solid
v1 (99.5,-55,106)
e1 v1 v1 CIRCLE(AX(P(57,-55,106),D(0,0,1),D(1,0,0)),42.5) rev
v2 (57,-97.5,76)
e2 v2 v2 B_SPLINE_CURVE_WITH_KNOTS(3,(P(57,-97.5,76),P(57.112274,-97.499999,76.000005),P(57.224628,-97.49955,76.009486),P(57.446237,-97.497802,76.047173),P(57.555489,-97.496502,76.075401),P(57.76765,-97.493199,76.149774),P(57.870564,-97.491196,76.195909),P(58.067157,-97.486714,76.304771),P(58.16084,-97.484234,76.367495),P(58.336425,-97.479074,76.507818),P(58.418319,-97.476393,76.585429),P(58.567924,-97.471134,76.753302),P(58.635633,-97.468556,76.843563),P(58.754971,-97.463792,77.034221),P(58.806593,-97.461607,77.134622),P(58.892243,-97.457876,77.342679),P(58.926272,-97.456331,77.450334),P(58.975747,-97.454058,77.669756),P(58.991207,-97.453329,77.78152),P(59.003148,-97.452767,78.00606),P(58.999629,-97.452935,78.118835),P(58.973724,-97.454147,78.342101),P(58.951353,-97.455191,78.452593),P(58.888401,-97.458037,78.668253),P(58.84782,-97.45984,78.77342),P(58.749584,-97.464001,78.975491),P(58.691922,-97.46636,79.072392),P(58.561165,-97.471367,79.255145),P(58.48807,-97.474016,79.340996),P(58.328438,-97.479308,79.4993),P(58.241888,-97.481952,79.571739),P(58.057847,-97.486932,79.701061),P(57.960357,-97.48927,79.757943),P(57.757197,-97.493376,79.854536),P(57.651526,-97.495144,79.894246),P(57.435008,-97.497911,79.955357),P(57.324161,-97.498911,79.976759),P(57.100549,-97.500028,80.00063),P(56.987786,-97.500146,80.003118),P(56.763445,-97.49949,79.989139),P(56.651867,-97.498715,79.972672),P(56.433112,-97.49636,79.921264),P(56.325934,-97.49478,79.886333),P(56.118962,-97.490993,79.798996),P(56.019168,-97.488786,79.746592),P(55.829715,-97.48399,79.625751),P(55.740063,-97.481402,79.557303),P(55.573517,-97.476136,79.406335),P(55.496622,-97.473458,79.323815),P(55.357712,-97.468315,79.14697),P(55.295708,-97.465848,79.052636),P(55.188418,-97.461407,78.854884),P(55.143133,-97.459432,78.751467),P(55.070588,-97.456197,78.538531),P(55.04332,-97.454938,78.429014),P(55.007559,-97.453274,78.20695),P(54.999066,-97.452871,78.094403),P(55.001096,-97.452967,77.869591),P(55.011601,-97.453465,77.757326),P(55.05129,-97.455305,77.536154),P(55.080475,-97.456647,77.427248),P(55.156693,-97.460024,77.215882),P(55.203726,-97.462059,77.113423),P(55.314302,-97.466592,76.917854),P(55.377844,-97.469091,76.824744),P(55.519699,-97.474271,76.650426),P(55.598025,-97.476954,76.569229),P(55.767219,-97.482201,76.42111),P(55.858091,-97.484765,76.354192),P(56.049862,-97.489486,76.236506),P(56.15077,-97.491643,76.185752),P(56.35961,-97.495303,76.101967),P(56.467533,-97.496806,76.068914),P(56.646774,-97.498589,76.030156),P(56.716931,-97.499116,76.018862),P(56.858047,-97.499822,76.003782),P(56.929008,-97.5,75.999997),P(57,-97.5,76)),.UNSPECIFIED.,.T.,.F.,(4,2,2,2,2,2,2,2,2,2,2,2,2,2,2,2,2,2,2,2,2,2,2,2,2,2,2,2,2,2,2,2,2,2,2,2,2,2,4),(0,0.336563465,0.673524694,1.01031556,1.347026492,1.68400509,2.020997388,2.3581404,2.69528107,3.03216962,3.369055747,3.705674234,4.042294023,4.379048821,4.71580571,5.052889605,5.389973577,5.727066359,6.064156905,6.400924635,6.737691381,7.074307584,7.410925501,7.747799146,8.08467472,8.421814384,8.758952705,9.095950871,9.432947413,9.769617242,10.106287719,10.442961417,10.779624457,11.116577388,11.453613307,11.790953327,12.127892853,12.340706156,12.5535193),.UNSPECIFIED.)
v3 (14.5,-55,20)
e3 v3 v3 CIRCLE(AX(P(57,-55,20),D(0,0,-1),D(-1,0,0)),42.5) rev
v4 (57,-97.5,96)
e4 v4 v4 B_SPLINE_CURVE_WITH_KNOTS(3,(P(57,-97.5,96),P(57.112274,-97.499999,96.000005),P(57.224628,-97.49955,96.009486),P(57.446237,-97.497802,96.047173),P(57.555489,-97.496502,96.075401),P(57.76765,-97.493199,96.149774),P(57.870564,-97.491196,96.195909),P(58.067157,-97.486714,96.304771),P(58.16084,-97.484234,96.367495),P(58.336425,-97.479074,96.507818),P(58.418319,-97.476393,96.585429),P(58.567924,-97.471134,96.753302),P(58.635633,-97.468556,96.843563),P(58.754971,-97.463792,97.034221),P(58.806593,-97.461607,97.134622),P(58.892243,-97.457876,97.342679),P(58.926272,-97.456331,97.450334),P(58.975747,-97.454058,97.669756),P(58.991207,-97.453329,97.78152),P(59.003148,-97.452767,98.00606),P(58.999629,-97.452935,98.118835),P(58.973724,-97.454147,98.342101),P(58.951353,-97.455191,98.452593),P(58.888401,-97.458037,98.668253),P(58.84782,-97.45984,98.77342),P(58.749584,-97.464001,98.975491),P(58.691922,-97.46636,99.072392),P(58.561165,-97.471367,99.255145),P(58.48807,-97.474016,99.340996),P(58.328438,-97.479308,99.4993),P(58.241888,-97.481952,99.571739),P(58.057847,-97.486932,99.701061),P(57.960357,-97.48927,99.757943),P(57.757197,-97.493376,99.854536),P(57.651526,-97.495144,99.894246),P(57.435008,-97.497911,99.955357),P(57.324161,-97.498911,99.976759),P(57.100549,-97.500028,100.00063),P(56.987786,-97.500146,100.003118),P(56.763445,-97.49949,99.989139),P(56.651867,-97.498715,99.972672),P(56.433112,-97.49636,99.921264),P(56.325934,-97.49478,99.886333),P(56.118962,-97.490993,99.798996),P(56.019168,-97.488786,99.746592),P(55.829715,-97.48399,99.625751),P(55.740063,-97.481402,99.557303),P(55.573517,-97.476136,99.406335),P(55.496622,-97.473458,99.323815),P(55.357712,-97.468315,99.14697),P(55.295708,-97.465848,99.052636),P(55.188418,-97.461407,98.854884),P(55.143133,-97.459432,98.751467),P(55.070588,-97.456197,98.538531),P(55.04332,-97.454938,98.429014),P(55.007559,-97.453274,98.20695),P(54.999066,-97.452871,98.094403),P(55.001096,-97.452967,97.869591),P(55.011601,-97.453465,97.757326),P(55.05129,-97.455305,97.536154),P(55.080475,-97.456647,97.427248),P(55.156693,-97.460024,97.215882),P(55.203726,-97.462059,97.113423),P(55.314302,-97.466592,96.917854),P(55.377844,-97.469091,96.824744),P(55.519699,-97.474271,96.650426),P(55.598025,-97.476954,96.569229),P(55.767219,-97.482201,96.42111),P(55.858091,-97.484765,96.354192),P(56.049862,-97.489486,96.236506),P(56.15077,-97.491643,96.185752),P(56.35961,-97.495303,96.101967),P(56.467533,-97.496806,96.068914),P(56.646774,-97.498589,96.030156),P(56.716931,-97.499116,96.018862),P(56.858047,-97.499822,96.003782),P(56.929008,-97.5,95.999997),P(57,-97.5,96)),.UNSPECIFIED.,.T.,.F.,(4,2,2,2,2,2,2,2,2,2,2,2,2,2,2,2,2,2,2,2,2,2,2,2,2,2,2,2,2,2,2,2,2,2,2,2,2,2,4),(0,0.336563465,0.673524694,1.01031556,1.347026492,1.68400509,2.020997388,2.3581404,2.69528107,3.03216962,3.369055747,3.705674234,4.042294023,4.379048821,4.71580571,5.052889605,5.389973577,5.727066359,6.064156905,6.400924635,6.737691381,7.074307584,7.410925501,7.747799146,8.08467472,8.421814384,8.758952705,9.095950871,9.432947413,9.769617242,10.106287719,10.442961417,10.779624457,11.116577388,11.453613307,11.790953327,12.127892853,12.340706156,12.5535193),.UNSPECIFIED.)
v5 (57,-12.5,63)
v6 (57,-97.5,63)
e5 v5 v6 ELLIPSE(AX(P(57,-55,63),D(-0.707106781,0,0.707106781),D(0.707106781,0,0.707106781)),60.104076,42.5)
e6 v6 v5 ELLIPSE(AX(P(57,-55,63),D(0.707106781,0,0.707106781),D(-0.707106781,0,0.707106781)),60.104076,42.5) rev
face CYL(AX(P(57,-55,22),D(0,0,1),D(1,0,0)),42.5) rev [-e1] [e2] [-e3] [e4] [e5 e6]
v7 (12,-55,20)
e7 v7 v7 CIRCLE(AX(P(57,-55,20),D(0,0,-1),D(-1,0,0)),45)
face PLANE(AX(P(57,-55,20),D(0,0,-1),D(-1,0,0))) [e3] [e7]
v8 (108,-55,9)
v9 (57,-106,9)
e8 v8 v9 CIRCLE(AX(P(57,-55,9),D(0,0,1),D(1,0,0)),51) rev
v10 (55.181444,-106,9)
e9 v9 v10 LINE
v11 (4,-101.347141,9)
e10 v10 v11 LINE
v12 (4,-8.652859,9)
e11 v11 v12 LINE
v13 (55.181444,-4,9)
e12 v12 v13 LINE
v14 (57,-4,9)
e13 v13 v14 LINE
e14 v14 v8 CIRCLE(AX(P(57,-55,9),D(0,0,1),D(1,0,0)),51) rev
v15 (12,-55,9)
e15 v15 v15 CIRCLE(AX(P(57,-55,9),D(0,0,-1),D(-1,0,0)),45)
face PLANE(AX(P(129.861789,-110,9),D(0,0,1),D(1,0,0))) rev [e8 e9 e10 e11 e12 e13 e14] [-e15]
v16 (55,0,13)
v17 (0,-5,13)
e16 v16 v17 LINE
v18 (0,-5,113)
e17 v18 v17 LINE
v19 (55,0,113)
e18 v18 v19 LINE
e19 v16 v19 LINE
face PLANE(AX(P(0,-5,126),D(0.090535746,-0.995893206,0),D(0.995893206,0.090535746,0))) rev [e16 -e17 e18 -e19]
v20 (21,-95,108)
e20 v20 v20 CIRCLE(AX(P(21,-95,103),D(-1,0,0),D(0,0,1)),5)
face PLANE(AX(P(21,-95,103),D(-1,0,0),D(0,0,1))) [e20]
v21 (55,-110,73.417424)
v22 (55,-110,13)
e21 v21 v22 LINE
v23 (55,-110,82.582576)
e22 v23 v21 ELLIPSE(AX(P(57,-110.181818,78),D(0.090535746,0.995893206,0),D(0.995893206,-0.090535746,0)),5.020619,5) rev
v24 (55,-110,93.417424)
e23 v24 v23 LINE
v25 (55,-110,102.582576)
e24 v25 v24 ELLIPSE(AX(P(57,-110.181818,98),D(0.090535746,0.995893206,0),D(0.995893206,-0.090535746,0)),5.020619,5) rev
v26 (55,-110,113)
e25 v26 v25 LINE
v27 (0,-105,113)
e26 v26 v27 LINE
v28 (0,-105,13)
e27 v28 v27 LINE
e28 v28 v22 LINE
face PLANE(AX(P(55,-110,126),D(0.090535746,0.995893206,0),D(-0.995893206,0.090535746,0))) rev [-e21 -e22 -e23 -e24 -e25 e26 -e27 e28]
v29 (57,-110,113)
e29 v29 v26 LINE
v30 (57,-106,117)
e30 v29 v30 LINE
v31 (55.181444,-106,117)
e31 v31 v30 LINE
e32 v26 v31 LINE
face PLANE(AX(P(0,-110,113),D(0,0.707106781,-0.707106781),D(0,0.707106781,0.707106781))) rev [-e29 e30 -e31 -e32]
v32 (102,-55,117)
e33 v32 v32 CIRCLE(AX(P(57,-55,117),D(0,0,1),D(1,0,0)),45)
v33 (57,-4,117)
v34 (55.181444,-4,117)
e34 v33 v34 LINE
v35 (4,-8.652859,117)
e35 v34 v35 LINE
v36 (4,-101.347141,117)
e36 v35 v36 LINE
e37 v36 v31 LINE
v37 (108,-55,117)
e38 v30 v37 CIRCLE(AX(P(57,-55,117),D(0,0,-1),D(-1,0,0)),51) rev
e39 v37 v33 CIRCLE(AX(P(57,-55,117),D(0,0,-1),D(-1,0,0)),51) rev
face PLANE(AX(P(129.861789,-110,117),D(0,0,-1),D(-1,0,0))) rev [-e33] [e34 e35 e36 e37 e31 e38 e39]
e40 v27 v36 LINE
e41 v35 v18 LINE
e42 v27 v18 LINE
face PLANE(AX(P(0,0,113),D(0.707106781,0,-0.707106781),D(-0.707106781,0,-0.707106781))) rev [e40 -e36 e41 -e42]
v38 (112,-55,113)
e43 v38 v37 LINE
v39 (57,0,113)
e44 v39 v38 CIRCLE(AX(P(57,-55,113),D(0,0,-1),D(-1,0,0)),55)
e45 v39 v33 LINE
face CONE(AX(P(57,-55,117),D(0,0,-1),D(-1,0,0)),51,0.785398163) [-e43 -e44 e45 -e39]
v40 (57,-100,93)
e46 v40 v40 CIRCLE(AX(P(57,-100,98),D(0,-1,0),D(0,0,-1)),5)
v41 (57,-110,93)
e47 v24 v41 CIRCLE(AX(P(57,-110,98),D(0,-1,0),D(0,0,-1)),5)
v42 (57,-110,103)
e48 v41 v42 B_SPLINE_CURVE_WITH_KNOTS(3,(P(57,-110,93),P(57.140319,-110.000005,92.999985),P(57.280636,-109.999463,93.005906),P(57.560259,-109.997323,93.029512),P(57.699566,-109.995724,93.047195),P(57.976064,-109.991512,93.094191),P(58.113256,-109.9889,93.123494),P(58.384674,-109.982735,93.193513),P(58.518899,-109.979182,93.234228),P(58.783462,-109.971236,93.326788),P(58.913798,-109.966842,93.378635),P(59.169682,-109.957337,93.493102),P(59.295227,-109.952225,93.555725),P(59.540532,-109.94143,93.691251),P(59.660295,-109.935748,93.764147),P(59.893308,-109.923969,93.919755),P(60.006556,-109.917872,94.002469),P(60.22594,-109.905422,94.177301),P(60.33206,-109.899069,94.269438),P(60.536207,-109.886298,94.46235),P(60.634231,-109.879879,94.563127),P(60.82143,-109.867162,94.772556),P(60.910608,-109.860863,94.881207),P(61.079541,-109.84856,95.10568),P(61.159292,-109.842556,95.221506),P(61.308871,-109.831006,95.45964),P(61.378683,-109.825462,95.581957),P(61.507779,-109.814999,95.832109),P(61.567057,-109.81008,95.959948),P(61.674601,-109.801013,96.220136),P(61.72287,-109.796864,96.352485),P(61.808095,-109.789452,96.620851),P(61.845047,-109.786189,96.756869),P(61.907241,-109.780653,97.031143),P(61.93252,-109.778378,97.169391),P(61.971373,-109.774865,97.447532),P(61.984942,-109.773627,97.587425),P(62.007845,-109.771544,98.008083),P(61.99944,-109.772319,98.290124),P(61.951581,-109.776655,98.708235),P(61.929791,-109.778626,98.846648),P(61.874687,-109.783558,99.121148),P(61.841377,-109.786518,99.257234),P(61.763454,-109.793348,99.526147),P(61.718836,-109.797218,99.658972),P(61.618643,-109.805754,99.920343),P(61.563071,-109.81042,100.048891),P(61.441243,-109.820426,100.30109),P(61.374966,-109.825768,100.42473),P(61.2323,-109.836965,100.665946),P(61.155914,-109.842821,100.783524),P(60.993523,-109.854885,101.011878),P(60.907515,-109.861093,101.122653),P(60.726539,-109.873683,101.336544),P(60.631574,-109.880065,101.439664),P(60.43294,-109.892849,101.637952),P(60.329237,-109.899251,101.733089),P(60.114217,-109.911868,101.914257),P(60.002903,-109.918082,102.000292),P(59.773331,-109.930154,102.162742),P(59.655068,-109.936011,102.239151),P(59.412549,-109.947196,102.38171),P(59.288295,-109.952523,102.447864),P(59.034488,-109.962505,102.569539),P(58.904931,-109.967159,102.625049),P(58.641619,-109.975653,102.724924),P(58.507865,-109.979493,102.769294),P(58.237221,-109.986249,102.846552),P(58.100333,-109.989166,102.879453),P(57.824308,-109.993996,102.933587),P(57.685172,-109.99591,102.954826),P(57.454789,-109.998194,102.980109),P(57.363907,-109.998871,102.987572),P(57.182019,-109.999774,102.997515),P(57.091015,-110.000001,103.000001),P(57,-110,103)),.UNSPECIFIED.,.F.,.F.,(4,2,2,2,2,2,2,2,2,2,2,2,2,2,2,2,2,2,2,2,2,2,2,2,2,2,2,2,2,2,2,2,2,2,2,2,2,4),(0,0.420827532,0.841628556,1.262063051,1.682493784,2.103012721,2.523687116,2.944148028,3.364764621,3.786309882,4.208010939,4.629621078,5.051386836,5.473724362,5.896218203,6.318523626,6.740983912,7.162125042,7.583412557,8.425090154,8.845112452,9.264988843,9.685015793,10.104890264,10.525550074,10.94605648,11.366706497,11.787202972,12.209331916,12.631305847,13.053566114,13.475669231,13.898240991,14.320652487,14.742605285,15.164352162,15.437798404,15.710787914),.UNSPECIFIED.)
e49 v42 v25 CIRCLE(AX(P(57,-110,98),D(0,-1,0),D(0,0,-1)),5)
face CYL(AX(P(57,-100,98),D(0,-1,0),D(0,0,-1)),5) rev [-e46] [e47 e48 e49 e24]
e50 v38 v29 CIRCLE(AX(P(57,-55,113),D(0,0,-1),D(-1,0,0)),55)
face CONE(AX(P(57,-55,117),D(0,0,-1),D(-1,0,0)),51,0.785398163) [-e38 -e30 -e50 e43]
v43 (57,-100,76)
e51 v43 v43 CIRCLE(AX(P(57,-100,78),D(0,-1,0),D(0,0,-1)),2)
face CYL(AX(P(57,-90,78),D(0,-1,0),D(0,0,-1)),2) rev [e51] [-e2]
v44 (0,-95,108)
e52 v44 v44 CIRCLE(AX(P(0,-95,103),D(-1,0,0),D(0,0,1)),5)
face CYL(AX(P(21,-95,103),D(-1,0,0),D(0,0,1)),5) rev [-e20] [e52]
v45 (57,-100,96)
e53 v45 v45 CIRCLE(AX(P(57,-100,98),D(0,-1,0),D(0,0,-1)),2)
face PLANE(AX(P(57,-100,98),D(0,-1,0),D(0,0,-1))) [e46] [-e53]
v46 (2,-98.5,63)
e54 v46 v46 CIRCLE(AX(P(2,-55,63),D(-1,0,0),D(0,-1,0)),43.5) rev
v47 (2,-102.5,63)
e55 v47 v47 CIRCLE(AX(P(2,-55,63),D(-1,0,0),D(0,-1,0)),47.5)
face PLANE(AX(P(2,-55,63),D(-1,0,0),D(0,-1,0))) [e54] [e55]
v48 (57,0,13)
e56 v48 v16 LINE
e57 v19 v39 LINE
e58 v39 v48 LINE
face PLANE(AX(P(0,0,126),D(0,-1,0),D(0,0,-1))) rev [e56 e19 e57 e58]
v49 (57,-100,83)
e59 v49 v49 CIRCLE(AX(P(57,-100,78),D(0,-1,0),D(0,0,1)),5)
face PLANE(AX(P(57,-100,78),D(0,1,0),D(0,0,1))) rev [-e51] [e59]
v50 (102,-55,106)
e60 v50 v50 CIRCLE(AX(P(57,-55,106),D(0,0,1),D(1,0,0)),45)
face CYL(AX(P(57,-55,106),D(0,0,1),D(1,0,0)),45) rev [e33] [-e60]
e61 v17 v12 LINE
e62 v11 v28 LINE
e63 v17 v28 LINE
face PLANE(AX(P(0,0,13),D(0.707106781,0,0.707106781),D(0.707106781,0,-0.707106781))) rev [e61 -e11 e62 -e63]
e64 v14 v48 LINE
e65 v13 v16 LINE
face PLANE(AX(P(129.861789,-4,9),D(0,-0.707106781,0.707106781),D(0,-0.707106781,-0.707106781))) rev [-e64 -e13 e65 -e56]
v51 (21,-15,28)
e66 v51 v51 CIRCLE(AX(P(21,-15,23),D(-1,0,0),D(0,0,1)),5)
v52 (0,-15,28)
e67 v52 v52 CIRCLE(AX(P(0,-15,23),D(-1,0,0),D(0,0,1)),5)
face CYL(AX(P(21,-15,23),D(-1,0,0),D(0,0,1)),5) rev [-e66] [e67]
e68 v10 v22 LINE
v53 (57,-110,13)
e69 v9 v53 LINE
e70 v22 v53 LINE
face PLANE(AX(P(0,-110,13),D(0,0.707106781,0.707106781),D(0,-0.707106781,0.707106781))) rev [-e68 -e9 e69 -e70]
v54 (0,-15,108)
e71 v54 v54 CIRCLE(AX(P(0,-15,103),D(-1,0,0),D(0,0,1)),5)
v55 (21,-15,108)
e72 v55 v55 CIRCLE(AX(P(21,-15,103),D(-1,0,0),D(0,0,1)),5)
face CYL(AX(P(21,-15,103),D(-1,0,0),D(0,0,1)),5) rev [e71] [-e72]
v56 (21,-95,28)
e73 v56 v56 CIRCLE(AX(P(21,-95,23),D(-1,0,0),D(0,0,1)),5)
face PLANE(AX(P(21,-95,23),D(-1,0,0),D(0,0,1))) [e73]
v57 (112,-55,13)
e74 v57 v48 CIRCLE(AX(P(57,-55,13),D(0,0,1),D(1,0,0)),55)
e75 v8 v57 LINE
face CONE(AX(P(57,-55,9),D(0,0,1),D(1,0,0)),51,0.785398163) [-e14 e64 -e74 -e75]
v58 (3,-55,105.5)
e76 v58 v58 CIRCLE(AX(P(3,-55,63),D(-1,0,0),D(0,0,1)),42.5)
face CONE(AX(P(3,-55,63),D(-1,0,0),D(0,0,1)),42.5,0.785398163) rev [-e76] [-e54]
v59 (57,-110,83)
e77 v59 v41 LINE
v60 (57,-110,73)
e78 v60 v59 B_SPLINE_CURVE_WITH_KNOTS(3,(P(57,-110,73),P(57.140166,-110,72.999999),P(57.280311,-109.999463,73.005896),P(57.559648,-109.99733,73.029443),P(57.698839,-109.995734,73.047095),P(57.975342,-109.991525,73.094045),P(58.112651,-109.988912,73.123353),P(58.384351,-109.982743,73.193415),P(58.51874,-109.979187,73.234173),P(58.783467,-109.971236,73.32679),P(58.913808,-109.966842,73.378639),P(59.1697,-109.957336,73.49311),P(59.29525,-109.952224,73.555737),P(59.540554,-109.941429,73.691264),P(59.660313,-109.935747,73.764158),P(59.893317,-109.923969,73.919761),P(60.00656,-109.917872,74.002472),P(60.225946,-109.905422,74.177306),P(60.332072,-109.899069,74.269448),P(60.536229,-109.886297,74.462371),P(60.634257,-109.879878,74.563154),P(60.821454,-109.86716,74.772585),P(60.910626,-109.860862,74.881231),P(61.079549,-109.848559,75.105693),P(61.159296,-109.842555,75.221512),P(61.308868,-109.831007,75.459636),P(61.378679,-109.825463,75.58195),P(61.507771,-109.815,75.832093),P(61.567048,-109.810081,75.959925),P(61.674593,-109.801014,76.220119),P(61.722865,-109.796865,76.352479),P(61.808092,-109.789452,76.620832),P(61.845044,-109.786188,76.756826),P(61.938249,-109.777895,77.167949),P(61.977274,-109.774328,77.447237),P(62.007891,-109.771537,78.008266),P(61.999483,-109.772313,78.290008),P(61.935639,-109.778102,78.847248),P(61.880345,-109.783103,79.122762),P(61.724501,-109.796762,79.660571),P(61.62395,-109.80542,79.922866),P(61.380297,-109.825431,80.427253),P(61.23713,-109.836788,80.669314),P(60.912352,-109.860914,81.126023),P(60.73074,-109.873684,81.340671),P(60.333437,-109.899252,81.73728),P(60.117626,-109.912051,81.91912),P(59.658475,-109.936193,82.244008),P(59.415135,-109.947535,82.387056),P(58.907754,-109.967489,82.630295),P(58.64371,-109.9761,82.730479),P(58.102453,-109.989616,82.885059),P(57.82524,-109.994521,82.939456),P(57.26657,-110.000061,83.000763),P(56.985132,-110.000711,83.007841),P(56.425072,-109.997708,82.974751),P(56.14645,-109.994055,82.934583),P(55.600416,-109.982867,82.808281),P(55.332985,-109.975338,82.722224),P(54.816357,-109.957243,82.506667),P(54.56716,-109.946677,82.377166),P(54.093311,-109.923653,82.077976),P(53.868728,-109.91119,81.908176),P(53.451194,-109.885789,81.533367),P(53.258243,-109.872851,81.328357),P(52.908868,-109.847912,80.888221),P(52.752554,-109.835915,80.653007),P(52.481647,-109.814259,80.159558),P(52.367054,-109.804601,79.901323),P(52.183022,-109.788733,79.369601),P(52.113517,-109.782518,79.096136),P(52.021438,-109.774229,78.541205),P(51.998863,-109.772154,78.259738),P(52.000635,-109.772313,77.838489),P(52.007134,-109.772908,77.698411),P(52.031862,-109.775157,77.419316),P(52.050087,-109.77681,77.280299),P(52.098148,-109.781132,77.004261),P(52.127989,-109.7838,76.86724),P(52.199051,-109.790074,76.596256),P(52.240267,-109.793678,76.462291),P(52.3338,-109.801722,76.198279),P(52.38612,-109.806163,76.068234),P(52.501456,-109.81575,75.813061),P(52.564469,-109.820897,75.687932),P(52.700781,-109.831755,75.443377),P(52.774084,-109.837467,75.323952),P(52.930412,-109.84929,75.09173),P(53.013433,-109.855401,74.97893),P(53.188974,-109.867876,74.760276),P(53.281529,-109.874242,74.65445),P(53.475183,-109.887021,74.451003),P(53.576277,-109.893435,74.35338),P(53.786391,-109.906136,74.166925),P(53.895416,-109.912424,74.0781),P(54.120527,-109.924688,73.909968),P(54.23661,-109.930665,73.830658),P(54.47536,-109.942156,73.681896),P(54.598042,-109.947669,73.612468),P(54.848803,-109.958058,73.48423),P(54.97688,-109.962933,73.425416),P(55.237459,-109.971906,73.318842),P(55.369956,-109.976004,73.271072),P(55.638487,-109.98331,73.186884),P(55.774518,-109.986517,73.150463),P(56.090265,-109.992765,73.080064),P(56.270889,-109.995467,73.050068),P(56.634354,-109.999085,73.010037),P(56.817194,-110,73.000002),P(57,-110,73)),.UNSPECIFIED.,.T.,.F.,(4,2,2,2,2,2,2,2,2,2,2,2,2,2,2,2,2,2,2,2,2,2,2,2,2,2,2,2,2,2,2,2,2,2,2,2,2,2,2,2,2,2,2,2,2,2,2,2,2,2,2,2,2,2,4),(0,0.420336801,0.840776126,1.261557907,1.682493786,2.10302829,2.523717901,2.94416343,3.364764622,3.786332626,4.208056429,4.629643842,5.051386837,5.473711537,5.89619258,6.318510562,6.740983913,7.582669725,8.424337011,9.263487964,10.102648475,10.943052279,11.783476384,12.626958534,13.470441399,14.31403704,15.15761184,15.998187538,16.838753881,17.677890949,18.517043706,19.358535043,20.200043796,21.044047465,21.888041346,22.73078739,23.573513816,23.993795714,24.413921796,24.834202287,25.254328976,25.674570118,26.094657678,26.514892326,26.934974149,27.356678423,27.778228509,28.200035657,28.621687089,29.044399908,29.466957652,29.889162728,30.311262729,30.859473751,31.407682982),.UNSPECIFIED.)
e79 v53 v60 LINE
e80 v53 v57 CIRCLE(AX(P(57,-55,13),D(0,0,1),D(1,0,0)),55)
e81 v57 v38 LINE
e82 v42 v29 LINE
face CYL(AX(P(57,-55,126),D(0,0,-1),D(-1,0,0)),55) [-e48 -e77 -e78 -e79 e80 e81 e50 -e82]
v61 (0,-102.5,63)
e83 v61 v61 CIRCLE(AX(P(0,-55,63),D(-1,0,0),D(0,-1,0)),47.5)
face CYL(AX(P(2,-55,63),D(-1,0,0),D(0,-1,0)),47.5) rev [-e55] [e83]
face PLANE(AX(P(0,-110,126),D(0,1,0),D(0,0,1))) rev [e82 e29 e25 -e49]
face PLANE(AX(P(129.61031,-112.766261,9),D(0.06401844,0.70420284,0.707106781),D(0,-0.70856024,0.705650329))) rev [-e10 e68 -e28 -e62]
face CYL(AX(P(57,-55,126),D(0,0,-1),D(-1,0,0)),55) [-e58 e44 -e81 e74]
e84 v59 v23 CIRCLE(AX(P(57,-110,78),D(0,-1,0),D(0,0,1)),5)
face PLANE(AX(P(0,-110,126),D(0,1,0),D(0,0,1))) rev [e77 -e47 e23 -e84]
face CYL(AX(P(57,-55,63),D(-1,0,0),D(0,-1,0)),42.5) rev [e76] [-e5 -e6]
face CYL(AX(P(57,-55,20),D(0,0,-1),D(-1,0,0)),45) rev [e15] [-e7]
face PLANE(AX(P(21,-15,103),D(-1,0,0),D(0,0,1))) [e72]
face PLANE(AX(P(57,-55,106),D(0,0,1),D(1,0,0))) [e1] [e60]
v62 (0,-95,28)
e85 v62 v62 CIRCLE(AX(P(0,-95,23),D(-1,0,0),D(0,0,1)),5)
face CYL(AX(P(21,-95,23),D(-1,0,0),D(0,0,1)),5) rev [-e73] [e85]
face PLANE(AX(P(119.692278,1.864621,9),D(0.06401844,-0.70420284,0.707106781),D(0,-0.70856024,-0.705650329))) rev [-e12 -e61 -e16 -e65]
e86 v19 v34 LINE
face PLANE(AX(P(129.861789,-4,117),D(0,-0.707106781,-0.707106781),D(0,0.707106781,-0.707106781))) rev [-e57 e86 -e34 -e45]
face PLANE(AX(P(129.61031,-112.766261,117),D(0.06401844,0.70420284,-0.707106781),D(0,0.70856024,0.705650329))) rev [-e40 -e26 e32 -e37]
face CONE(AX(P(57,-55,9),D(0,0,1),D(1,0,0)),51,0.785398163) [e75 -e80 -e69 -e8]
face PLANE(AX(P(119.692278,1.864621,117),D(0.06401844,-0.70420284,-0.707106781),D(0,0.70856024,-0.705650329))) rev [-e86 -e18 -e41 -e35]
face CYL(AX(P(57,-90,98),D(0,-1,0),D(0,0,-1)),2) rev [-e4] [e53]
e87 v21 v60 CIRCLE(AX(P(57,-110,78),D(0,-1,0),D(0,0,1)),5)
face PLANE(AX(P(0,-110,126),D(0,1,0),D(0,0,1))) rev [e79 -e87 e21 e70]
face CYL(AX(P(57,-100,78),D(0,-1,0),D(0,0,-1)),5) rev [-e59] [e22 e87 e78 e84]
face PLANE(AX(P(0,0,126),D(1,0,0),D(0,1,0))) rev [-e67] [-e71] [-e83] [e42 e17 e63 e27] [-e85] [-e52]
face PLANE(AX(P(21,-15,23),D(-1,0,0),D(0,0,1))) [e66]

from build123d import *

# Parameters (mm, degrees)
SKETCH_1_W           = 112
SKETCH_1_H           = 110
EXTRUDE_1_DEPTH      = 126
FILLET_1_R           = 55
SKETCH_9_R           = 42.5
CUT_EXTRUDE_5_DEPTH  = 104
SKETCH_10_R          = 42.5
CUT_EXTRUDE_6_DEPTH  = 57
CUT_EXTRUDE_START    = -50
SKETCH_11_R          = 42.5
CUT_EXTRUDE_7_DEPTH  = 50
CHAMFER_1_SIZE       = 55
CHAMFER_1_SIZE2      = 5
CHAMFER_2_SIZE       = 5
CHAMFER_2_SIZE2      = 55
SKETCH_14_W          = 143.089430894
SKETCH_14_H          = 9
CUT_EXTRUDE_8_DEPTH  = 202.295802241
CHAMFER_5_SIZE       = 4
CHAMFER_6_SIZE       = 4
SKETCH_18_R          = 5
CUT_EXTRUDE_9_DEPTH  = 21
SKETCH_19_R          = 45
CUT_EXTRUDE_10_DEPTH = 11
CUT_EXTRUDE_START_2  = -11
SKETCH_20_R          = 45
CUT_EXTRUDE_11_DEPTH = 11
CHAMFER_7_SIZE       = 4
SKETCH_17_R          = 47.5
SKETCH_17_R_2        = 42.5
CUT_EXTRUDE_12_DEPTH = 2
CHAMFER_8_SIZE       = 1
SKETCH_21_R          = 5
CUT_EXTRUDE_13_DEPTH = 10
SKETCH_22_R          = 2
CUT_EXTRUDE_14_DEPTH = 10


# Some blends are built 0.0001 mm under size
with BuildPart() as part:
    # 草图1 → 拉伸1 (new body)
    with BuildSketch(Plane.XY):
        with Locations((56, -55)):
            Rectangle(SKETCH_1_W, SKETCH_1_H)
    extrude(amount=EXTRUDE_1_DEPTH)

    # 圆角1
    fillet_1_edges = [part.edges().sort_by_distance(p)[0] for p in [
        (112, -110, 63),
        (112, 0, 63),
    ]]
    fillet(fillet_1_edges, radius=FILLET_1_R - 0.0001)  # a hair under: the kernel refuses the full size

    # 草图9 → 切除-拉伸5 (cut)
    with BuildSketch(Plane.XY.offset(126)):
        with Locations((57, -55)):
            Circle(SKETCH_9_R)
    extrude(amount=-CUT_EXTRUDE_5_DEPTH, mode=Mode.SUBTRACT)

    # 草图10 → 切除-拉伸6 (cut)
    with BuildSketch(Plane.ZY):
        with Locations(Location((63, -55, 0), (0, 0, 270))):
            Circle(SKETCH_10_R)
    extrude(amount=-CUT_EXTRUDE_6_DEPTH, mode=Mode.SUBTRACT)

    # 草图11 → 切除-拉伸7 (cut)
    with BuildSketch(Plane(origin=(0, 0, 0), x_dir=(-1, 0, 0), z_dir=(0, 0, -1)).offset(CUT_EXTRUDE_START)):
        with Locations(Location((-57, -55, 0), (0, 0, 180))):
            Circle(SKETCH_11_R)
    extrude(amount=CUT_EXTRUDE_7_DEPTH, mode=Mode.SUBTRACT)

    # 倒角1
    chamfer_1_edges = [part.edges().sort_by_distance(p)[0] for p in [
        (0, 0, 63),
    ]]
    chamfer_1_side = [part.faces().sort_by_distance(p)[0] for p in [
        (28.50005, 0, 63),
    ]]
    chamfer(chamfer_1_edges, length=CHAMFER_1_SIZE, length2=CHAMFER_1_SIZE2, reference=chamfer_1_side[0])

    # 倒角2
    chamfer_2_edges = [part.edges().sort_by_distance(p)[0] for p in [
        (0, -110, 63),
    ]]
    chamfer_2_side = [part.faces().sort_by_distance(p)[0] for p in [
        (0, -57.5, 1.640152432),
    ]]
    chamfer(chamfer_2_edges, length=CHAMFER_2_SIZE, length2=CHAMFER_2_SIZE2, reference=chamfer_2_side[0])

    # 草图14 → 切除-拉伸8 (cut, through all)
    with BuildSketch(Plane(origin=(0, 0, 0), x_dir=(1, 0, 0), z_dir=(0, 1, 0))):
        with Locations((58.317073171, -4.5)):
            Rectangle(SKETCH_14_W, SKETCH_14_H)
        with Locations((58.317073171, -121.5)):
            Rectangle(SKETCH_14_W, SKETCH_14_H)
    extrude(amount=-CUT_EXTRUDE_8_DEPTH, mode=Mode.SUBTRACT)

    # 倒角5
    chamfer_5_edges = [part.edges().sort_by_distance(p)[0] for p in [
        (0, -55, 117),
    ]]
    chamfer(chamfer_5_edges, length=CHAMFER_5_SIZE)

    # 倒角6
    chamfer_6_edges = [part.edges().sort_by_distance(p)[0] for p in [
        (0, -55, 9),
    ]]
    chamfer(chamfer_6_edges, length=CHAMFER_6_SIZE)

    # 草图18 → 切除-拉伸9 (cut)
    with BuildSketch(Plane.ZY):
        with Locations((23, -15)):
            Circle(SKETCH_18_R)
        with Locations((103, -15)):
            Circle(SKETCH_18_R)
        with Locations((23, -95)):
            Circle(SKETCH_18_R)
        with Locations((103, -95)):
            Circle(SKETCH_18_R)
    extrude(amount=-CUT_EXTRUDE_9_DEPTH, mode=Mode.SUBTRACT)

    # 草图19 → 切除-拉伸10 (cut)
    with BuildSketch(Plane.XY.offset(117)):
        with Locations((57, -55)):
            Circle(SKETCH_19_R)
    extrude(amount=-CUT_EXTRUDE_10_DEPTH, mode=Mode.SUBTRACT)

    # 草图20 → 切除-拉伸11 (cut)
    with BuildSketch(Plane(origin=(0, 0, 9), x_dir=(-1, 0, 0), z_dir=(0, 0, -1)).offset(CUT_EXTRUDE_START_2)):
        with Locations(Location((-57, -55, 0), (0, 0, 180))):
            Circle(SKETCH_20_R)
    extrude(amount=CUT_EXTRUDE_11_DEPTH, mode=Mode.SUBTRACT)

    # 倒角7
    # the kernel refuses this chamfer: 4 mm, written as the material it takes off along each edge
    with BuildSketch(Plane(origin=(-6.244486468, -104.432319412, 117), x_dir=(-0.002489359702032544, -0.027382956722357982, -0.9996219169112968), z_dir=(0.9958932064677039, -0.09053574604251853, 0)), Plane(origin=(65.244486468, 0.931316952, 117), x_dir=(-0.002489359702032457, 0.027382956722357025, -0.9996219169112968), z_dir=(-0.9958932064677039, -0.09053574604251853, 0))) as chamfer_7_piece_1:
        Polygon((CHAMFER_7_SIZE * 0.999621916911, CHAMFER_7_SIZE * 0.0274958766106), (-CHAMFER_7_SIZE * 0.0274958766106, CHAMFER_7_SIZE * 0.999621916911), (0, 0), align=None)
    extrude(amount=71.783774074, mode=Mode.SUBTRACT)
    with BuildSketch(Plane(origin=(57.0001, -110, 117), x_dir=(0, 0.9996219169112968, 0.027495876610585647), z_dir=(-1, 0, 0)), Plane(origin=(44.713268048, 0, 117), x_dir=(0, -0.9996219169112968, 0.02749587661058563), z_dir=(1, 0, 0))) as chamfer_7_piece_2:
        Polygon((CHAMFER_7_SIZE * 0.999621916911, CHAMFER_7_SIZE * 0.0274958766106), (-CHAMFER_7_SIZE * 0.0274958766106, CHAMFER_7_SIZE * 0.999621916911), (0, 0), align=None)
    extrude(amount=12.286831952, mode=Mode.SUBTRACT)
    with BuildSketch(Plane(origin=(57.0001, -55.0001, 117), x_dir=(0, -1, 0), z_dir=(-1, 0, 0))) as chamfer_7_piece_3:
        Polygon((54.9999 - CHAMFER_7_SIZE, 0), (54.9999, -CHAMFER_7_SIZE), (54.9999, 0), align=None)
    revolve(axis=Axis((57.0001, -55.0001, 117), (0, 0, 1)), revolution_arc=90, mode=Mode.SUBTRACT)
    with BuildSketch(Plane(origin=(57.0001, -54.9999, 117), x_dir=(1, 0, 0), z_dir=(0, -1, 0))) as chamfer_7_piece_4:
        Polygon((54.9999 - CHAMFER_7_SIZE, 0), (54.9999, -CHAMFER_7_SIZE), (54.9999, 0), align=None)
    revolve(axis=Axis((57.0001, -54.9999, 117), (0, 0, 1)), revolution_arc=90, mode=Mode.SUBTRACT)
    with BuildSketch(Plane(origin=(-6.244486468, -104.432319412, 9), x_dir=(-0.002489359702032431, -0.027382956722357972, 0.9996219169112968), z_dir=(0.9958932064677039, -0.09053574604251853, 0)), Plane(origin=(65.244486468, 0.931316952, 9), x_dir=(-0.0024893597020323437, 0.02738295672235701, 0.9996219169112968), z_dir=(-0.9958932064677039, -0.09053574604251853, 0))) as chamfer_7_piece_5:
        Polygon((CHAMFER_7_SIZE * 0.999621916911, -CHAMFER_7_SIZE * 0.0274958766106), (-CHAMFER_7_SIZE * 0.0274958766106, -CHAMFER_7_SIZE * 0.999621916911), (0, 0), align=None)
    extrude(amount=71.783774074, mode=Mode.SUBTRACT)
    with BuildSketch(Plane(origin=(44.713268048, 0, 9), x_dir=(0, -0.9996219169112968, -0.027495876610586494), z_dir=(1, 0, 0)), Plane(origin=(57.0001, -110, 9), x_dir=(0, 0.9996219169112968, -0.02749587661058651), z_dir=(-1, 0, 0))) as chamfer_7_piece_6:
        Polygon((CHAMFER_7_SIZE * 0.999621916911, -CHAMFER_7_SIZE * 0.0274958766106), (-CHAMFER_7_SIZE * 0.0274958766106, -CHAMFER_7_SIZE * 0.999621916911), (0, 0), align=None)
    extrude(amount=12.286831952, mode=Mode.SUBTRACT)
    with BuildSketch(Plane(origin=(57.0001, -54.9999, 9), x_dir=(1, 0, 0), z_dir=(0, -1, 0))) as chamfer_7_piece_7:
        Polygon((54.9999 - CHAMFER_7_SIZE, 0), (54.9999, CHAMFER_7_SIZE), (54.9999, 0), align=None)
    revolve(axis=Axis((57.0001, -54.9999, 9), (0, 0, 1)), revolution_arc=90, mode=Mode.SUBTRACT)
    with BuildSketch(Plane(origin=(57.0001, -55.0001, 9), x_dir=(0, -1, 0), z_dir=(-1, 0, 0))) as chamfer_7_piece_8:
        Polygon((54.9999 - CHAMFER_7_SIZE, 0), (54.9999, CHAMFER_7_SIZE), (54.9999, 0), align=None)
    revolve(axis=Axis((57.0001, -55.0001, 9), (0, 0, 1)), revolution_arc=90, mode=Mode.SUBTRACT)
    with BuildSketch(Plane(origin=(112, -54.9999, 9), x_dir=(-0.9996219169112968, 0, -0.02749587661058651), z_dir=(0, -1, 0))) as chamfer_7_piece_9:
        Polygon((CHAMFER_7_SIZE * 0.999621916911, -CHAMFER_7_SIZE * 0.0274958766106), (-CHAMFER_7_SIZE * 0.0274958766106, -CHAMFER_7_SIZE * 0.999621916911), (0, 0), align=None)
    extrude(amount=0.0002, mode=Mode.SUBTRACT)
    with BuildSketch(Plane(origin=(112, -54.9999, 117), x_dir=(-0.9996219169112968, 0, 0.027495876610585647), z_dir=(0, -1, 0))) as chamfer_7_piece_10:
        Polygon((CHAMFER_7_SIZE * 0.999621916911, CHAMFER_7_SIZE * 0.0274958766106), (-CHAMFER_7_SIZE * 0.0274958766106, CHAMFER_7_SIZE * 0.999621916911), (0, 0), align=None)
    extrude(amount=0.0002, mode=Mode.SUBTRACT)

    # 草图17 → 切除-拉伸12 (cut)
    with BuildSketch(Plane.ZY):
        with Locations(Location((63, -55, 0), (0, 0, 270))):
            Circle(SKETCH_17_R)
        with Locations(Location((63, -55, 0), (0, 0, 270))):
            Circle(SKETCH_17_R_2, mode=Mode.SUBTRACT)
    extrude(amount=-CUT_EXTRUDE_12_DEPTH, mode=Mode.SUBTRACT)

    # 倒角8
    chamfer_8_edges = [part.edges().sort_by_distance(p)[0] for p in [
        (2, -12.5, 63),
    ]]
    chamfer(chamfer_8_edges, length=CHAMFER_8_SIZE)

    # 草图21 → 切除-拉伸13 (cut)
    with BuildSketch(Plane.XZ.offset(110)):
        with Locations(Location((57, 98, 0), (0, 0, 270))):
            Circle(SKETCH_21_R)
        with Locations(Location((57, 78, 0), (0, 0, 90))):
            Circle(SKETCH_21_R)
    extrude(amount=-CUT_EXTRUDE_13_DEPTH, mode=Mode.SUBTRACT)

    # 草图22 → 切除-拉伸14 (cut)
    with BuildSketch(Plane.XZ.offset(100)):
        with Locations(Location((57, 78, 0), (0, 0, 270))):
            Circle(SKETCH_22_R)
        with Locations(Location((57, 98, 0), (0, 0, 270))):
            Circle(SKETCH_22_R)
    extrude(amount=-CUT_EXTRUDE_14_DEPTH, mode=Mode.SUBTRACT)


solid = part.part
